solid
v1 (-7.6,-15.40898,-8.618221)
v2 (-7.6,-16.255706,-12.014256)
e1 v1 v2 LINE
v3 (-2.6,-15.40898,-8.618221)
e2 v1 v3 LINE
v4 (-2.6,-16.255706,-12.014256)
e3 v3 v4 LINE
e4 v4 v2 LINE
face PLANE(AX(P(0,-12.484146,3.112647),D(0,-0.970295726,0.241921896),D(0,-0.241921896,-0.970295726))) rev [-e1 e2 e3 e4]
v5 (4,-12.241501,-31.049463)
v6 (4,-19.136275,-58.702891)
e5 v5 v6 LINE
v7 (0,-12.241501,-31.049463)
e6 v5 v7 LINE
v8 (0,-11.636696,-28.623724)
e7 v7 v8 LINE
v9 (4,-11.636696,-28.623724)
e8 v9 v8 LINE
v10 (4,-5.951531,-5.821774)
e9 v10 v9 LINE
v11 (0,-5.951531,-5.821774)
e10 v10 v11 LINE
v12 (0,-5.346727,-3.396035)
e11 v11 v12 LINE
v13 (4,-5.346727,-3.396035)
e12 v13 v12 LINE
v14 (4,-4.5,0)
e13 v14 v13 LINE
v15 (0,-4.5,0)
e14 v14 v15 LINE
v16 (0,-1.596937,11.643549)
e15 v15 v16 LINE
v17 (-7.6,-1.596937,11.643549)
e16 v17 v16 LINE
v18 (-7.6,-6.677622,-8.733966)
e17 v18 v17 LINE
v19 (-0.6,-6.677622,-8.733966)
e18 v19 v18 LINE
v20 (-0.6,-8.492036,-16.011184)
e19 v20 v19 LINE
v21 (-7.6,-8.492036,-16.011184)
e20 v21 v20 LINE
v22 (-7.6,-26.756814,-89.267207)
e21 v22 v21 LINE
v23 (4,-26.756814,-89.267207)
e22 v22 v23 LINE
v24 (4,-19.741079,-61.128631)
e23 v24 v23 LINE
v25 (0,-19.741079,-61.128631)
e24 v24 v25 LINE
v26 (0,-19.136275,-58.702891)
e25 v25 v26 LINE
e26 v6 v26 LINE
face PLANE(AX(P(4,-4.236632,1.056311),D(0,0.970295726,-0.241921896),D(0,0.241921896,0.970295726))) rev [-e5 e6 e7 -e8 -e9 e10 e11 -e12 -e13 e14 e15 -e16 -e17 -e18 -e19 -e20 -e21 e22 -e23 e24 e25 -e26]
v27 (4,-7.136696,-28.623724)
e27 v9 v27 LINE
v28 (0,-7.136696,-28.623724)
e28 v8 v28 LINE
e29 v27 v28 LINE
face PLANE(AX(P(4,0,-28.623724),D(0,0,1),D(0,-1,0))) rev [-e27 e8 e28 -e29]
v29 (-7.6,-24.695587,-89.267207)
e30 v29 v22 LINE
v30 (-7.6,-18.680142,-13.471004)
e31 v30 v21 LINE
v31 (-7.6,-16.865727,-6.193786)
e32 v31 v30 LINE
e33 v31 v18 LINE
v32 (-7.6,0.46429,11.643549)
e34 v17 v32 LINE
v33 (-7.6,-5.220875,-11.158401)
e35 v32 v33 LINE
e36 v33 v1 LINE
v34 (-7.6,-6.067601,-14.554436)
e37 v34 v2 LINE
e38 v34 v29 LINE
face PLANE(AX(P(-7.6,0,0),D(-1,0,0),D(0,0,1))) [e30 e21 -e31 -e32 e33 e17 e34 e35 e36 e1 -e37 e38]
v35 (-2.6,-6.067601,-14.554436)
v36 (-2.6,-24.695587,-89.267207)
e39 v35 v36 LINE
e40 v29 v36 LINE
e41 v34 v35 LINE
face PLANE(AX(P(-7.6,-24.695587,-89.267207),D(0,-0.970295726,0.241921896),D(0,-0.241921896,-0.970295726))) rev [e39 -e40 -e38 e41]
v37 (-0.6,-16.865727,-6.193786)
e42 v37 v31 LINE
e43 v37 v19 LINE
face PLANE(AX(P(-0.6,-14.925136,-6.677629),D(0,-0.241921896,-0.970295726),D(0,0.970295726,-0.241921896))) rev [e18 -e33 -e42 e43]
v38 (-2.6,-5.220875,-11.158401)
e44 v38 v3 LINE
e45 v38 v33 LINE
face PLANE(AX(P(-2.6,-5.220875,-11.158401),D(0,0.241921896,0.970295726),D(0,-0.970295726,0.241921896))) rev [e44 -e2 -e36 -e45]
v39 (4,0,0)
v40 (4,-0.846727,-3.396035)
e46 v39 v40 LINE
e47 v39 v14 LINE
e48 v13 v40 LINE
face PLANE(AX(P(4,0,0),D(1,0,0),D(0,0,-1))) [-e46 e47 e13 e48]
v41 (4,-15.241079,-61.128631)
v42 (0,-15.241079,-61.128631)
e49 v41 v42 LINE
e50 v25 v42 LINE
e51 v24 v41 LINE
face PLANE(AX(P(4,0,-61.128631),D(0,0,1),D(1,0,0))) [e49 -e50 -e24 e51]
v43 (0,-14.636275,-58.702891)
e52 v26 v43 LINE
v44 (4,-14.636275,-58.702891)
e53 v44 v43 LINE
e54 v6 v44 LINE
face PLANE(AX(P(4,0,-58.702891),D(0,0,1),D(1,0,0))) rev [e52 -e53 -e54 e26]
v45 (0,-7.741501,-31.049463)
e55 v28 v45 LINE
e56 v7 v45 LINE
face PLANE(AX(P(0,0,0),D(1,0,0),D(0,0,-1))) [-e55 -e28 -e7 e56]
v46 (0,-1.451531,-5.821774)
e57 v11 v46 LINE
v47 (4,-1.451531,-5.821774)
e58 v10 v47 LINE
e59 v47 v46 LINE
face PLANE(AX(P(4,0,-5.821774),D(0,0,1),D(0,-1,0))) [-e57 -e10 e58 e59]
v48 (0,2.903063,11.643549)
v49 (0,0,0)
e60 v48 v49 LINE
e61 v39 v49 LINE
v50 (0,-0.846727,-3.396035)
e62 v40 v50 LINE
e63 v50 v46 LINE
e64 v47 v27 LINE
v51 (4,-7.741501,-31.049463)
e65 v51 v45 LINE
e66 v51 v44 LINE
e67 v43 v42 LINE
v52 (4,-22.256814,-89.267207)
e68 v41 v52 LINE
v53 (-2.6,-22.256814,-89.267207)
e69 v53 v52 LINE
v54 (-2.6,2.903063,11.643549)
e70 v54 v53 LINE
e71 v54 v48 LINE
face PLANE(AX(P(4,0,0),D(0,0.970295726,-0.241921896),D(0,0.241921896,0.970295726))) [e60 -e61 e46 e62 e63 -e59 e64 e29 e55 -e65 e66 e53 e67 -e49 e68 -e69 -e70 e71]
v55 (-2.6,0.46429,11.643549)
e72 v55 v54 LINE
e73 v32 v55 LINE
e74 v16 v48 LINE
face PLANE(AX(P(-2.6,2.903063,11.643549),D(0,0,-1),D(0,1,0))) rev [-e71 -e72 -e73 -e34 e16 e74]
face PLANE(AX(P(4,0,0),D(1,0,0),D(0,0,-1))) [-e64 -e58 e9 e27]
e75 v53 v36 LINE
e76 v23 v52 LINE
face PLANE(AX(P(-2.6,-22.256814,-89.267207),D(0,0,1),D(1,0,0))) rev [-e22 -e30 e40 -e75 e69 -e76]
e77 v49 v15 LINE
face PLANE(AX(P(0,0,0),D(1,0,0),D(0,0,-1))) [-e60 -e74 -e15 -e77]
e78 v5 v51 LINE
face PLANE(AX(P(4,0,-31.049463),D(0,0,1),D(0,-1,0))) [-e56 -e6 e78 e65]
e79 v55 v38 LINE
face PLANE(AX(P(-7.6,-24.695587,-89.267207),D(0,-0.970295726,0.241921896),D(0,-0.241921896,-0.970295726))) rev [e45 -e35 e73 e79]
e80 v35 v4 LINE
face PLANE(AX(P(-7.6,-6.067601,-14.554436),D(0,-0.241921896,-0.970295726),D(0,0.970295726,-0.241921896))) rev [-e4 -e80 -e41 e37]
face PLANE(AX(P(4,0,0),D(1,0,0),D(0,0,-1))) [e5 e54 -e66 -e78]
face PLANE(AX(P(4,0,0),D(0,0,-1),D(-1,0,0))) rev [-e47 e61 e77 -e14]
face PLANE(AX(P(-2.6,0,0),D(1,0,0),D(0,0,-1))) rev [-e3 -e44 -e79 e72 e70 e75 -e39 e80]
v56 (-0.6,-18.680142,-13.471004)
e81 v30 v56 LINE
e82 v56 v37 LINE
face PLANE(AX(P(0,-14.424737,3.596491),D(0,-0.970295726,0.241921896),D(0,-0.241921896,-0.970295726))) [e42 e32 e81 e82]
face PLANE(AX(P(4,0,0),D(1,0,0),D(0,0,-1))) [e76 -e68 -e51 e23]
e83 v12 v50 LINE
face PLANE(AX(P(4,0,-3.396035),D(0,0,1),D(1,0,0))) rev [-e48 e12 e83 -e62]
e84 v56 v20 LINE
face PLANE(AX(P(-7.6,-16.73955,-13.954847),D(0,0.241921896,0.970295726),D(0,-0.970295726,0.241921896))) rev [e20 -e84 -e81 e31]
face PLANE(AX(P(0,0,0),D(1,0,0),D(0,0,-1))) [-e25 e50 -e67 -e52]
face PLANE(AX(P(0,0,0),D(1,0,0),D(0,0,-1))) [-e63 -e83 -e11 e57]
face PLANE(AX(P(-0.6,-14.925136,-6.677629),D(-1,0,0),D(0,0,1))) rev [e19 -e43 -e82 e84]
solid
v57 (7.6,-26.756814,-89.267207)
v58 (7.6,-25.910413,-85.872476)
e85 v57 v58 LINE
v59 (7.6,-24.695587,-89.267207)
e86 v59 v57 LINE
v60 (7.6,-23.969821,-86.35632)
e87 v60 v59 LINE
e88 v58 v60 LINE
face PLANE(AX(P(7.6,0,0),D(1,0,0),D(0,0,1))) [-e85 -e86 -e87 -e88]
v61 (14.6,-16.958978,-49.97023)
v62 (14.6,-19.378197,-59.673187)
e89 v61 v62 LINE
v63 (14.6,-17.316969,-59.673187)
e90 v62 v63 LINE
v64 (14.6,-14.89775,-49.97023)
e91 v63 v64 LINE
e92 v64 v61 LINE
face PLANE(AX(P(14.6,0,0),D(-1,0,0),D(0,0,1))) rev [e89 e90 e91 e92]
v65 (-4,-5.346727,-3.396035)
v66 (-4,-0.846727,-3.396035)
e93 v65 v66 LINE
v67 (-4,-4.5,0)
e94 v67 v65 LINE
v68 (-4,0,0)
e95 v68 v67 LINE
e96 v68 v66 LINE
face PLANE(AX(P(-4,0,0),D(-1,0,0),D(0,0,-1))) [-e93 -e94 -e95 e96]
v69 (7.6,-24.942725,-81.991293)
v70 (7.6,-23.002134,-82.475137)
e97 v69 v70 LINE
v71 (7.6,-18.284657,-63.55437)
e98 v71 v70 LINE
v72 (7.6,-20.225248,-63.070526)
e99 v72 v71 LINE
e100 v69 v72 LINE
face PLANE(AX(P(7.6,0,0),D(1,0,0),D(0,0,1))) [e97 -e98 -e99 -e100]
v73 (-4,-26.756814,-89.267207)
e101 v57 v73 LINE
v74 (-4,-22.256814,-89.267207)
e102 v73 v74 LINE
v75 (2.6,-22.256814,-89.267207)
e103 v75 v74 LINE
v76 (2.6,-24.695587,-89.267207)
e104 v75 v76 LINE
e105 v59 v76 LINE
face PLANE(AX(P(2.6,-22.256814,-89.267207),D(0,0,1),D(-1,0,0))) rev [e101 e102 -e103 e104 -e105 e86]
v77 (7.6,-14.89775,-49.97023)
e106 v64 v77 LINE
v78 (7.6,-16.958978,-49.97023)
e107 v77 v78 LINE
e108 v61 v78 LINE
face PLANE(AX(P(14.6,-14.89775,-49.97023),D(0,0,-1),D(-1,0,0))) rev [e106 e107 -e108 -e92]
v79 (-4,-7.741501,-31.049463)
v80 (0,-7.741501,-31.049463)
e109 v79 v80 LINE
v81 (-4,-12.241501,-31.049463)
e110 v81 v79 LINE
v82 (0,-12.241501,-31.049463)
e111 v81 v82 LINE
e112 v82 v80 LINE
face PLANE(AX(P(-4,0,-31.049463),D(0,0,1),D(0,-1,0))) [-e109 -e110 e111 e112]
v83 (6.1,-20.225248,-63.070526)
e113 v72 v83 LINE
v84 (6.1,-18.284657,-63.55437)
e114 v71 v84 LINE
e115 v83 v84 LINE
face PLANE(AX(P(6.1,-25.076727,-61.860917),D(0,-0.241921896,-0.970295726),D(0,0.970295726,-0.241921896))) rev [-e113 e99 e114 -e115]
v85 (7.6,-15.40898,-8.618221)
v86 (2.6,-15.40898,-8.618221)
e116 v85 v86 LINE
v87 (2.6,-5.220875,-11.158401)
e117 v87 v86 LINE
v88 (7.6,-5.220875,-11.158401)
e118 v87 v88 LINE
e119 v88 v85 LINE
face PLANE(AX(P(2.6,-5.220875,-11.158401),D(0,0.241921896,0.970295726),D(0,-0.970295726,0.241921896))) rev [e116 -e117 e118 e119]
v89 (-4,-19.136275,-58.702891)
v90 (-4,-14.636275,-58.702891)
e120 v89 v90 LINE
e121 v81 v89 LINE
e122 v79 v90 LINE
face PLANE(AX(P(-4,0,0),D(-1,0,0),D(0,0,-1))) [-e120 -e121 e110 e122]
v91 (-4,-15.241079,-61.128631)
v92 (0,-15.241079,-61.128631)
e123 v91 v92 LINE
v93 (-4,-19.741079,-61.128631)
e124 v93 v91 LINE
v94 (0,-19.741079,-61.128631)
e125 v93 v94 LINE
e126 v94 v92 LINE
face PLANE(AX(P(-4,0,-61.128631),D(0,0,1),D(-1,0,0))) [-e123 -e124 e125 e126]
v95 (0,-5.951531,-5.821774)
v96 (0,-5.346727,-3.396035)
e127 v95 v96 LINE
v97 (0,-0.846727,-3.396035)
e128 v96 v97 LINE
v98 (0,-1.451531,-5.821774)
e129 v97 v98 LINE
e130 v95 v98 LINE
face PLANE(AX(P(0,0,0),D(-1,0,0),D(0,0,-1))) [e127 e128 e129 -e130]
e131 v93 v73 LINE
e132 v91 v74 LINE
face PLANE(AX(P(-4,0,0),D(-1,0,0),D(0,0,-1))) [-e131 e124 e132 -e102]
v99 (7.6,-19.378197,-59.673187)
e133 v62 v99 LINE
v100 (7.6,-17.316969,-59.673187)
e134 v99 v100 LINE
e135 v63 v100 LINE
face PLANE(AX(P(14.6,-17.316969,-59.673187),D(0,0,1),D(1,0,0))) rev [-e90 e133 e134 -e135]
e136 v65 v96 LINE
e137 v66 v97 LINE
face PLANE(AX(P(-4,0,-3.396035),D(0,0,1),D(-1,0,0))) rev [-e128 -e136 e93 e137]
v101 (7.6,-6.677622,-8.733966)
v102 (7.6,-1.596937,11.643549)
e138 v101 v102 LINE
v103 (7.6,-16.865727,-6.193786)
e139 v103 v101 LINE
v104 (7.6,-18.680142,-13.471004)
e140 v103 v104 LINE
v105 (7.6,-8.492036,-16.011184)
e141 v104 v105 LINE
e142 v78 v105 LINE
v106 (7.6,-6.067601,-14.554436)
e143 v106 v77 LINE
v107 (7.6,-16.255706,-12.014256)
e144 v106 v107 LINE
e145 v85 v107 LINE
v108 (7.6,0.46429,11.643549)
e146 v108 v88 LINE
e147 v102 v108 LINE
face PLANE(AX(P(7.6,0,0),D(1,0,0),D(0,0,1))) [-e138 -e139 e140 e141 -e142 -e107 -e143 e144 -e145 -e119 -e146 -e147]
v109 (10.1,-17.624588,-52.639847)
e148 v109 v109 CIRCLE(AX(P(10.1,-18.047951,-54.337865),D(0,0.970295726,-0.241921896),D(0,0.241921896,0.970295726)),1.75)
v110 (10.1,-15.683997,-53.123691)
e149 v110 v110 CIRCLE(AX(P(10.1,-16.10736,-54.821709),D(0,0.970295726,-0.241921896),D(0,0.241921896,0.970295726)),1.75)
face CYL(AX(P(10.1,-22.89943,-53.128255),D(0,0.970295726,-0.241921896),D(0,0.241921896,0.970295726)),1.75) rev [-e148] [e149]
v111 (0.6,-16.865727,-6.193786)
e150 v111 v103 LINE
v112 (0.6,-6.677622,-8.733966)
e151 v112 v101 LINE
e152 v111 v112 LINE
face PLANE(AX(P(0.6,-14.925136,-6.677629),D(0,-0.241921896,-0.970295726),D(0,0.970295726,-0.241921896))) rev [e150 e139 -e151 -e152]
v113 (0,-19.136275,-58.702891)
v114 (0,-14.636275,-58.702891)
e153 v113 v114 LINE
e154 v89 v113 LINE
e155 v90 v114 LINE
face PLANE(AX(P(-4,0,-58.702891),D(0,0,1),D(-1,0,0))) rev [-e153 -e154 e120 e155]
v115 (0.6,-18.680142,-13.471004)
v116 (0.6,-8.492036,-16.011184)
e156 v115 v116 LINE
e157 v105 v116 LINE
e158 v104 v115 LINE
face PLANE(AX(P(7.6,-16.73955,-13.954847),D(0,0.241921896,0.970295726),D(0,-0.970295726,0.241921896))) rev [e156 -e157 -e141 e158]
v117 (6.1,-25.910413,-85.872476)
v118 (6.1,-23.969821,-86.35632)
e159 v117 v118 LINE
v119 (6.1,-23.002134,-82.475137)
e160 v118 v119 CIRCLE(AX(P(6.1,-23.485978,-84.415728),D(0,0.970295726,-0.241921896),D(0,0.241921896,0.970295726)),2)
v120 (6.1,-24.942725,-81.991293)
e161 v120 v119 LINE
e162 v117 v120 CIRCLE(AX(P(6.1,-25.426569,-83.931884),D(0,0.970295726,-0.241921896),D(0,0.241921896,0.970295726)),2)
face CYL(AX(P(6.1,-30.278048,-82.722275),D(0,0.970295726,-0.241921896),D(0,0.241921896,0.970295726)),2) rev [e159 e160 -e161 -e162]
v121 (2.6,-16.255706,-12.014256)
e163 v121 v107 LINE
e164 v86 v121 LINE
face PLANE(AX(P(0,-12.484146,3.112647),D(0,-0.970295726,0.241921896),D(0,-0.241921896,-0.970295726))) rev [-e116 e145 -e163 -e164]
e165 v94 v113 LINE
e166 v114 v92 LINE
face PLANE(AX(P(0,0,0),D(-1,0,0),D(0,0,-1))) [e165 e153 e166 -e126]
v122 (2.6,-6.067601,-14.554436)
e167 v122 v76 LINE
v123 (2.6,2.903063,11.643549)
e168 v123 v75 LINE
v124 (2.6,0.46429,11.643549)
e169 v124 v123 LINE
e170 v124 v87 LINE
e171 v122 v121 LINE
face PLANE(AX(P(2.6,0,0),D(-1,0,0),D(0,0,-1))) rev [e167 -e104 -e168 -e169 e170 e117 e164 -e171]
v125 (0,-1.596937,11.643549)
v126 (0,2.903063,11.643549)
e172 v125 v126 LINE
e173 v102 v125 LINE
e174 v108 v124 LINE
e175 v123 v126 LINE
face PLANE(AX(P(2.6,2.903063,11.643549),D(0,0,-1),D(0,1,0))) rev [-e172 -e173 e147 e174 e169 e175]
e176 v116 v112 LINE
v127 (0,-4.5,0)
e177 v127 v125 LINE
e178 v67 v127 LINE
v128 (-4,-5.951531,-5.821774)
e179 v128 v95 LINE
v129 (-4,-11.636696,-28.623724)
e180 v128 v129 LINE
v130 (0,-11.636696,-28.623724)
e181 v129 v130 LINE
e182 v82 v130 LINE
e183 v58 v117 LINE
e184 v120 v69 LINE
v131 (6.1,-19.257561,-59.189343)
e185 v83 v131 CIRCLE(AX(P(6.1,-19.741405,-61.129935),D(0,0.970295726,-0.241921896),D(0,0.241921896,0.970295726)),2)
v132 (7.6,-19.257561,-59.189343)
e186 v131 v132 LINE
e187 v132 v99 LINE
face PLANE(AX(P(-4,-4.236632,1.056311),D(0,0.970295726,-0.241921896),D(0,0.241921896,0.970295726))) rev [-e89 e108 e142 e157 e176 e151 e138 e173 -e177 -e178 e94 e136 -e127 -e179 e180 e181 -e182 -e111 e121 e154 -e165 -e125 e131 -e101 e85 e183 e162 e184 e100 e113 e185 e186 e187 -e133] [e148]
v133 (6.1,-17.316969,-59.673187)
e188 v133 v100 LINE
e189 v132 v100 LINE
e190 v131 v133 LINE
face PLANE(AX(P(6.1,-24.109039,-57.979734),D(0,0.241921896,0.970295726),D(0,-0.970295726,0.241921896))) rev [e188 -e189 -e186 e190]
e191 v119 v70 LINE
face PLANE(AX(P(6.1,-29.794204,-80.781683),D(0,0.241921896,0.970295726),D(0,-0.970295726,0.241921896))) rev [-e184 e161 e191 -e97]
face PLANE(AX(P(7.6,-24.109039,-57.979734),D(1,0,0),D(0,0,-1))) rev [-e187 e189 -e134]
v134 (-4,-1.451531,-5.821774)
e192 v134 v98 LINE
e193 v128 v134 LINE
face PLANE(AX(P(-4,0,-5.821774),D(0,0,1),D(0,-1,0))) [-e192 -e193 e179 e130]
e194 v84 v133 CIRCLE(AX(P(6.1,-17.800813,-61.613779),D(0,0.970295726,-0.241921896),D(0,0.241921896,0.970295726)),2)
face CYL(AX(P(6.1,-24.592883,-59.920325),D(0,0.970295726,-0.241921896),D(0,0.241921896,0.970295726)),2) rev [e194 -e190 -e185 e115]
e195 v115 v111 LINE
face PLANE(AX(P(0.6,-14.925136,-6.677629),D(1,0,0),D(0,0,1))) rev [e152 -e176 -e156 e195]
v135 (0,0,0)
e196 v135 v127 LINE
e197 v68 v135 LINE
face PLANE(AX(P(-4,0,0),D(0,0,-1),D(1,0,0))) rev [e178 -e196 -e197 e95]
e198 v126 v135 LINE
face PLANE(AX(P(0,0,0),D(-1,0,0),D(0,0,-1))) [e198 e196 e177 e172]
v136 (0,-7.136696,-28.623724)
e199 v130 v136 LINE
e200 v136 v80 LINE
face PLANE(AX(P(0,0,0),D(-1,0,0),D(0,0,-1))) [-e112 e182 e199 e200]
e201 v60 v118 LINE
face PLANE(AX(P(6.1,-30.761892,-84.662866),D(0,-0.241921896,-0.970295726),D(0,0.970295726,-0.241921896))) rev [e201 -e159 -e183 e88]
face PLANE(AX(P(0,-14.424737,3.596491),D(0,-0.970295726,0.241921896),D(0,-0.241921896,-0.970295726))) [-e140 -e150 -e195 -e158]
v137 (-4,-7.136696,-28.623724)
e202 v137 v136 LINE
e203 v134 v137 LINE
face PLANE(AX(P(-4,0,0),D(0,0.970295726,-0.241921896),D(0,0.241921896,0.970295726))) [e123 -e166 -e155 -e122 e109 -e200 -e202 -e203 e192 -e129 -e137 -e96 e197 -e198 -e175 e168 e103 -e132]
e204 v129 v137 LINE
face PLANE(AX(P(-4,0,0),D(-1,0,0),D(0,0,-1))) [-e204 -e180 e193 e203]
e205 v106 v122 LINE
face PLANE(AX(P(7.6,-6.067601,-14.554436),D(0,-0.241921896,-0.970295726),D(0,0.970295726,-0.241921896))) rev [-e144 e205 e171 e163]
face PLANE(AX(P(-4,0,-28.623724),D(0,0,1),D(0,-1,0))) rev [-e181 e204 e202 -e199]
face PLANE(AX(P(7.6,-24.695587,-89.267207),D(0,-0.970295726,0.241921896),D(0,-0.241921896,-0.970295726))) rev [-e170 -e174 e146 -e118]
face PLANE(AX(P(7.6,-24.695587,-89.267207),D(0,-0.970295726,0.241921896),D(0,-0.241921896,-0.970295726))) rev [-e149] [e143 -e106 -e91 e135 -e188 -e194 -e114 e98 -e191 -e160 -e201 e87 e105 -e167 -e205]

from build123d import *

# Parameters (mm, degrees)
LEFT_START                   = -2.6
LEFT_SIDE_FOR_MIRROR_DEPTH   = 6.6
LEFT_START_2                 = -7.6
LEFT_SIDE_FOR_MIRROR_2_DEPTH = 7
LEFT_SIDE_FOR_MIRROR_3_DEPTH = 2
LEFT_START_3                 = -0.6
LEFT_SIDE_FOR_MIRROR_4_DEPTH = 0.6
BOSS_EXTRUDE1_DEPTH          = 7
SKETCH3_R                    = 1.75
CUT_EXTRUDE1_DEPTH           = 7
CUT_EXTRUDE2_DEPTH           = 7


# Read off the part's stored shape, not the designer's step: Left side (for mirror)
with BuildPart() as part:
    # Left side (for mirror) outline → Left side (for mirror) (new body)
    with BuildSketch(Plane.YZ.offset(LEFT_START)):
        Polygon((-19.741079423, -61.128630755), (-26.756814395, -89.267206817), (-22.256814395, -89.267206817), (-15.241079423, -61.128630755), align=None)
        Polygon((-12.241500659, -31.049463241), (-19.136274684, -58.70289144), (-14.636274684, -58.70289144), (-7.741500659, -31.049463241), align=None)
        Polygon((-11.63669592, -28.623723925), (-7.13669592, -28.623723925), (-1.451531374, -5.821774358), (-5.951531374, -5.821774358), align=None)
        Polygon((-0.846726635, -3.396035042), (0, 0), (-4.5, 0), (-5.346726635, -3.396035042), align=None)
    extrude(amount=LEFT_SIDE_FOR_MIRROR_DEPTH)

    # Left side _for mirror 2 outline → Left side _for mirror 2 (add)
    with BuildSketch(Plane.YZ.offset(LEFT_START_2)):
        Polygon((-26.756814395, -89.267206817), (-24.695587136, -89.267206817), (-6.067601175, -14.554435894), (-16.255706301, -12.01425599), (-15.408979667, -8.618220948), (-5.220874541, -11.158400852), (0.464290006, 11.643548715), (-1.596937253, 11.643548715), (-6.677622202, -8.733965608), (-16.865727328, -6.193785705), (-18.680141545, -13.471003652), (-8.492036419, -16.011183555), align=None)
    extrude(amount=LEFT_SIDE_FOR_MIRROR_2_DEPTH)



with BuildPart() as body_2:
    # Left side _for mirror 3 outline → Left side _for mirror 3 (new body)
    with BuildSketch(Plane.YZ.offset(LEFT_START)):
        Polygon((-17.075047425, -58.70289144), (-17.679852164, -61.128630755), (-15.241079423, -61.128630755), (-14.636274684, -58.70289144), align=None)
        Polygon((-9.575468661, -28.623723925), (-10.1802734, -31.049463241), (-7.741500659, -31.049463241), (-7.13669592, -28.623723925), align=None)
        Polygon((-16.255706301, -12.01425599), (-8.008192628, -14.070592103), (-7.161465993, -10.674557061), (-15.408979667, -8.618220948), align=None)
        Polygon((-3.890304115, -5.821774358), (-1.451531374, -5.821774358), (-0.846726635, -3.396035042), (-3.285499376, -3.396035042), align=None)
        Polygon((-2.438772741, 0), (0, 0), (2.903062747, 11.643548715), (0.464290006, 11.643548715), align=None)
    extrude(amount=LEFT_SIDE_FOR_MIRROR_3_DEPTH)


with BuildPart() as part_1:
    add(part.part)

    add(body_2.part)  # Left side _for mirror 4 merges body 2
    # Left side _for mirror 4 outline → Left side _for mirror 4 (add)
    with BuildSketch(Plane.YZ.offset(LEFT_START_3)):
        Polygon((-19.136274684, -58.70289144), (-19.741079423, -61.128630755), (-15.241079423, -61.128630755), (-14.636274684, -58.70289144), align=None)
        Polygon((-11.63669592, -28.623723925), (-12.241500659, -31.049463241), (-7.741500659, -31.049463241), (-7.13669592, -28.623723925), align=None)
        Polygon((-1.451531374, -5.821774358), (-0.846726635, -3.396035042), (-5.346726635, -3.396035042), (-5.951531374, -5.821774358), align=None)
        Polygon((0, 0), (2.903062747, 11.643548715), (-1.596937253, 11.643548715), (-4.5, 0), align=None)
    extrude(amount=LEFT_SIDE_FOR_MIRROR_4_DEPTH)


with BuildPart() as body_2_2:
    # Mirror4: mirrored copy
    add(part_1.part.mirror(Plane(origin=(0, 0, 0), x_dir=(0, 0, 1), z_dir=(1, 0, 0))))

    # Sketch2 → Boss-Extrude1 (add)
    with BuildSketch(Plane(origin=(7.6, 0, 0), x_dir=(0, 0, -1), z_dir=(1, 0, 0))):
        Polygon((49.970229903, -14.897750365), (49.970229903, -16.958977623), (59.673187166, -19.378196579), (59.673187166, -17.316969321), align=None)
    extrude(amount=BOSS_EXTRUDE1_DEPTH)

    # Sketch3 → Cut-Extrude1 (cut)
    with BuildSketch(Plane(origin=(0, -2.296040631, 0.572467225), x_dir=(1, 0, 0), z_dir=(0, 0.9702957262759965, -0.24192189559966834))):
        with Locations(Location((10.1, 57.089992525, 0), (0, 0, 270))):
            Circle(SKETCH3_R)
    extrude(amount=-CUT_EXTRUDE1_DEPTH, mode=Mode.SUBTRACT)

    # Sketch5 → Cut-Extrude2 (cut)
    with BuildSketch(Plane(origin=(0, -2.296040631, 0.572467225), x_dir=(1, 0, 0), z_dir=(0, 0.9702957262759965, -0.24192189559966834))):
        with BuildLine():
            Line((6.1, 62.089992525), (7.6, 62.089992525))
            Line((7.6, 62.089992525), (7.6, 66.089992525))
            Line((7.6, 66.089992525), (6.1, 66.089992525))
            ThreePointArc((6.1, 66.089992525), (4.1, 64.089992525), (6.1, 62.089992525))
        make_face()
        with BuildLine():
            Line((6.1, 85.589992525), (7.6, 85.589992525))
            Line((7.6, 85.589992525), (7.6, 89.589992525))
            Line((7.6, 89.589992525), (6.1, 89.589992525))
            ThreePointArc((6.1, 89.589992525), (4.1, 87.589992525), (6.1, 85.589992525))
        make_face()
    extrude(amount=-CUT_EXTRUDE2_DEPTH, mode=Mode.SUBTRACT)


solid = Compound([part_1.part, body_2_2.part])
